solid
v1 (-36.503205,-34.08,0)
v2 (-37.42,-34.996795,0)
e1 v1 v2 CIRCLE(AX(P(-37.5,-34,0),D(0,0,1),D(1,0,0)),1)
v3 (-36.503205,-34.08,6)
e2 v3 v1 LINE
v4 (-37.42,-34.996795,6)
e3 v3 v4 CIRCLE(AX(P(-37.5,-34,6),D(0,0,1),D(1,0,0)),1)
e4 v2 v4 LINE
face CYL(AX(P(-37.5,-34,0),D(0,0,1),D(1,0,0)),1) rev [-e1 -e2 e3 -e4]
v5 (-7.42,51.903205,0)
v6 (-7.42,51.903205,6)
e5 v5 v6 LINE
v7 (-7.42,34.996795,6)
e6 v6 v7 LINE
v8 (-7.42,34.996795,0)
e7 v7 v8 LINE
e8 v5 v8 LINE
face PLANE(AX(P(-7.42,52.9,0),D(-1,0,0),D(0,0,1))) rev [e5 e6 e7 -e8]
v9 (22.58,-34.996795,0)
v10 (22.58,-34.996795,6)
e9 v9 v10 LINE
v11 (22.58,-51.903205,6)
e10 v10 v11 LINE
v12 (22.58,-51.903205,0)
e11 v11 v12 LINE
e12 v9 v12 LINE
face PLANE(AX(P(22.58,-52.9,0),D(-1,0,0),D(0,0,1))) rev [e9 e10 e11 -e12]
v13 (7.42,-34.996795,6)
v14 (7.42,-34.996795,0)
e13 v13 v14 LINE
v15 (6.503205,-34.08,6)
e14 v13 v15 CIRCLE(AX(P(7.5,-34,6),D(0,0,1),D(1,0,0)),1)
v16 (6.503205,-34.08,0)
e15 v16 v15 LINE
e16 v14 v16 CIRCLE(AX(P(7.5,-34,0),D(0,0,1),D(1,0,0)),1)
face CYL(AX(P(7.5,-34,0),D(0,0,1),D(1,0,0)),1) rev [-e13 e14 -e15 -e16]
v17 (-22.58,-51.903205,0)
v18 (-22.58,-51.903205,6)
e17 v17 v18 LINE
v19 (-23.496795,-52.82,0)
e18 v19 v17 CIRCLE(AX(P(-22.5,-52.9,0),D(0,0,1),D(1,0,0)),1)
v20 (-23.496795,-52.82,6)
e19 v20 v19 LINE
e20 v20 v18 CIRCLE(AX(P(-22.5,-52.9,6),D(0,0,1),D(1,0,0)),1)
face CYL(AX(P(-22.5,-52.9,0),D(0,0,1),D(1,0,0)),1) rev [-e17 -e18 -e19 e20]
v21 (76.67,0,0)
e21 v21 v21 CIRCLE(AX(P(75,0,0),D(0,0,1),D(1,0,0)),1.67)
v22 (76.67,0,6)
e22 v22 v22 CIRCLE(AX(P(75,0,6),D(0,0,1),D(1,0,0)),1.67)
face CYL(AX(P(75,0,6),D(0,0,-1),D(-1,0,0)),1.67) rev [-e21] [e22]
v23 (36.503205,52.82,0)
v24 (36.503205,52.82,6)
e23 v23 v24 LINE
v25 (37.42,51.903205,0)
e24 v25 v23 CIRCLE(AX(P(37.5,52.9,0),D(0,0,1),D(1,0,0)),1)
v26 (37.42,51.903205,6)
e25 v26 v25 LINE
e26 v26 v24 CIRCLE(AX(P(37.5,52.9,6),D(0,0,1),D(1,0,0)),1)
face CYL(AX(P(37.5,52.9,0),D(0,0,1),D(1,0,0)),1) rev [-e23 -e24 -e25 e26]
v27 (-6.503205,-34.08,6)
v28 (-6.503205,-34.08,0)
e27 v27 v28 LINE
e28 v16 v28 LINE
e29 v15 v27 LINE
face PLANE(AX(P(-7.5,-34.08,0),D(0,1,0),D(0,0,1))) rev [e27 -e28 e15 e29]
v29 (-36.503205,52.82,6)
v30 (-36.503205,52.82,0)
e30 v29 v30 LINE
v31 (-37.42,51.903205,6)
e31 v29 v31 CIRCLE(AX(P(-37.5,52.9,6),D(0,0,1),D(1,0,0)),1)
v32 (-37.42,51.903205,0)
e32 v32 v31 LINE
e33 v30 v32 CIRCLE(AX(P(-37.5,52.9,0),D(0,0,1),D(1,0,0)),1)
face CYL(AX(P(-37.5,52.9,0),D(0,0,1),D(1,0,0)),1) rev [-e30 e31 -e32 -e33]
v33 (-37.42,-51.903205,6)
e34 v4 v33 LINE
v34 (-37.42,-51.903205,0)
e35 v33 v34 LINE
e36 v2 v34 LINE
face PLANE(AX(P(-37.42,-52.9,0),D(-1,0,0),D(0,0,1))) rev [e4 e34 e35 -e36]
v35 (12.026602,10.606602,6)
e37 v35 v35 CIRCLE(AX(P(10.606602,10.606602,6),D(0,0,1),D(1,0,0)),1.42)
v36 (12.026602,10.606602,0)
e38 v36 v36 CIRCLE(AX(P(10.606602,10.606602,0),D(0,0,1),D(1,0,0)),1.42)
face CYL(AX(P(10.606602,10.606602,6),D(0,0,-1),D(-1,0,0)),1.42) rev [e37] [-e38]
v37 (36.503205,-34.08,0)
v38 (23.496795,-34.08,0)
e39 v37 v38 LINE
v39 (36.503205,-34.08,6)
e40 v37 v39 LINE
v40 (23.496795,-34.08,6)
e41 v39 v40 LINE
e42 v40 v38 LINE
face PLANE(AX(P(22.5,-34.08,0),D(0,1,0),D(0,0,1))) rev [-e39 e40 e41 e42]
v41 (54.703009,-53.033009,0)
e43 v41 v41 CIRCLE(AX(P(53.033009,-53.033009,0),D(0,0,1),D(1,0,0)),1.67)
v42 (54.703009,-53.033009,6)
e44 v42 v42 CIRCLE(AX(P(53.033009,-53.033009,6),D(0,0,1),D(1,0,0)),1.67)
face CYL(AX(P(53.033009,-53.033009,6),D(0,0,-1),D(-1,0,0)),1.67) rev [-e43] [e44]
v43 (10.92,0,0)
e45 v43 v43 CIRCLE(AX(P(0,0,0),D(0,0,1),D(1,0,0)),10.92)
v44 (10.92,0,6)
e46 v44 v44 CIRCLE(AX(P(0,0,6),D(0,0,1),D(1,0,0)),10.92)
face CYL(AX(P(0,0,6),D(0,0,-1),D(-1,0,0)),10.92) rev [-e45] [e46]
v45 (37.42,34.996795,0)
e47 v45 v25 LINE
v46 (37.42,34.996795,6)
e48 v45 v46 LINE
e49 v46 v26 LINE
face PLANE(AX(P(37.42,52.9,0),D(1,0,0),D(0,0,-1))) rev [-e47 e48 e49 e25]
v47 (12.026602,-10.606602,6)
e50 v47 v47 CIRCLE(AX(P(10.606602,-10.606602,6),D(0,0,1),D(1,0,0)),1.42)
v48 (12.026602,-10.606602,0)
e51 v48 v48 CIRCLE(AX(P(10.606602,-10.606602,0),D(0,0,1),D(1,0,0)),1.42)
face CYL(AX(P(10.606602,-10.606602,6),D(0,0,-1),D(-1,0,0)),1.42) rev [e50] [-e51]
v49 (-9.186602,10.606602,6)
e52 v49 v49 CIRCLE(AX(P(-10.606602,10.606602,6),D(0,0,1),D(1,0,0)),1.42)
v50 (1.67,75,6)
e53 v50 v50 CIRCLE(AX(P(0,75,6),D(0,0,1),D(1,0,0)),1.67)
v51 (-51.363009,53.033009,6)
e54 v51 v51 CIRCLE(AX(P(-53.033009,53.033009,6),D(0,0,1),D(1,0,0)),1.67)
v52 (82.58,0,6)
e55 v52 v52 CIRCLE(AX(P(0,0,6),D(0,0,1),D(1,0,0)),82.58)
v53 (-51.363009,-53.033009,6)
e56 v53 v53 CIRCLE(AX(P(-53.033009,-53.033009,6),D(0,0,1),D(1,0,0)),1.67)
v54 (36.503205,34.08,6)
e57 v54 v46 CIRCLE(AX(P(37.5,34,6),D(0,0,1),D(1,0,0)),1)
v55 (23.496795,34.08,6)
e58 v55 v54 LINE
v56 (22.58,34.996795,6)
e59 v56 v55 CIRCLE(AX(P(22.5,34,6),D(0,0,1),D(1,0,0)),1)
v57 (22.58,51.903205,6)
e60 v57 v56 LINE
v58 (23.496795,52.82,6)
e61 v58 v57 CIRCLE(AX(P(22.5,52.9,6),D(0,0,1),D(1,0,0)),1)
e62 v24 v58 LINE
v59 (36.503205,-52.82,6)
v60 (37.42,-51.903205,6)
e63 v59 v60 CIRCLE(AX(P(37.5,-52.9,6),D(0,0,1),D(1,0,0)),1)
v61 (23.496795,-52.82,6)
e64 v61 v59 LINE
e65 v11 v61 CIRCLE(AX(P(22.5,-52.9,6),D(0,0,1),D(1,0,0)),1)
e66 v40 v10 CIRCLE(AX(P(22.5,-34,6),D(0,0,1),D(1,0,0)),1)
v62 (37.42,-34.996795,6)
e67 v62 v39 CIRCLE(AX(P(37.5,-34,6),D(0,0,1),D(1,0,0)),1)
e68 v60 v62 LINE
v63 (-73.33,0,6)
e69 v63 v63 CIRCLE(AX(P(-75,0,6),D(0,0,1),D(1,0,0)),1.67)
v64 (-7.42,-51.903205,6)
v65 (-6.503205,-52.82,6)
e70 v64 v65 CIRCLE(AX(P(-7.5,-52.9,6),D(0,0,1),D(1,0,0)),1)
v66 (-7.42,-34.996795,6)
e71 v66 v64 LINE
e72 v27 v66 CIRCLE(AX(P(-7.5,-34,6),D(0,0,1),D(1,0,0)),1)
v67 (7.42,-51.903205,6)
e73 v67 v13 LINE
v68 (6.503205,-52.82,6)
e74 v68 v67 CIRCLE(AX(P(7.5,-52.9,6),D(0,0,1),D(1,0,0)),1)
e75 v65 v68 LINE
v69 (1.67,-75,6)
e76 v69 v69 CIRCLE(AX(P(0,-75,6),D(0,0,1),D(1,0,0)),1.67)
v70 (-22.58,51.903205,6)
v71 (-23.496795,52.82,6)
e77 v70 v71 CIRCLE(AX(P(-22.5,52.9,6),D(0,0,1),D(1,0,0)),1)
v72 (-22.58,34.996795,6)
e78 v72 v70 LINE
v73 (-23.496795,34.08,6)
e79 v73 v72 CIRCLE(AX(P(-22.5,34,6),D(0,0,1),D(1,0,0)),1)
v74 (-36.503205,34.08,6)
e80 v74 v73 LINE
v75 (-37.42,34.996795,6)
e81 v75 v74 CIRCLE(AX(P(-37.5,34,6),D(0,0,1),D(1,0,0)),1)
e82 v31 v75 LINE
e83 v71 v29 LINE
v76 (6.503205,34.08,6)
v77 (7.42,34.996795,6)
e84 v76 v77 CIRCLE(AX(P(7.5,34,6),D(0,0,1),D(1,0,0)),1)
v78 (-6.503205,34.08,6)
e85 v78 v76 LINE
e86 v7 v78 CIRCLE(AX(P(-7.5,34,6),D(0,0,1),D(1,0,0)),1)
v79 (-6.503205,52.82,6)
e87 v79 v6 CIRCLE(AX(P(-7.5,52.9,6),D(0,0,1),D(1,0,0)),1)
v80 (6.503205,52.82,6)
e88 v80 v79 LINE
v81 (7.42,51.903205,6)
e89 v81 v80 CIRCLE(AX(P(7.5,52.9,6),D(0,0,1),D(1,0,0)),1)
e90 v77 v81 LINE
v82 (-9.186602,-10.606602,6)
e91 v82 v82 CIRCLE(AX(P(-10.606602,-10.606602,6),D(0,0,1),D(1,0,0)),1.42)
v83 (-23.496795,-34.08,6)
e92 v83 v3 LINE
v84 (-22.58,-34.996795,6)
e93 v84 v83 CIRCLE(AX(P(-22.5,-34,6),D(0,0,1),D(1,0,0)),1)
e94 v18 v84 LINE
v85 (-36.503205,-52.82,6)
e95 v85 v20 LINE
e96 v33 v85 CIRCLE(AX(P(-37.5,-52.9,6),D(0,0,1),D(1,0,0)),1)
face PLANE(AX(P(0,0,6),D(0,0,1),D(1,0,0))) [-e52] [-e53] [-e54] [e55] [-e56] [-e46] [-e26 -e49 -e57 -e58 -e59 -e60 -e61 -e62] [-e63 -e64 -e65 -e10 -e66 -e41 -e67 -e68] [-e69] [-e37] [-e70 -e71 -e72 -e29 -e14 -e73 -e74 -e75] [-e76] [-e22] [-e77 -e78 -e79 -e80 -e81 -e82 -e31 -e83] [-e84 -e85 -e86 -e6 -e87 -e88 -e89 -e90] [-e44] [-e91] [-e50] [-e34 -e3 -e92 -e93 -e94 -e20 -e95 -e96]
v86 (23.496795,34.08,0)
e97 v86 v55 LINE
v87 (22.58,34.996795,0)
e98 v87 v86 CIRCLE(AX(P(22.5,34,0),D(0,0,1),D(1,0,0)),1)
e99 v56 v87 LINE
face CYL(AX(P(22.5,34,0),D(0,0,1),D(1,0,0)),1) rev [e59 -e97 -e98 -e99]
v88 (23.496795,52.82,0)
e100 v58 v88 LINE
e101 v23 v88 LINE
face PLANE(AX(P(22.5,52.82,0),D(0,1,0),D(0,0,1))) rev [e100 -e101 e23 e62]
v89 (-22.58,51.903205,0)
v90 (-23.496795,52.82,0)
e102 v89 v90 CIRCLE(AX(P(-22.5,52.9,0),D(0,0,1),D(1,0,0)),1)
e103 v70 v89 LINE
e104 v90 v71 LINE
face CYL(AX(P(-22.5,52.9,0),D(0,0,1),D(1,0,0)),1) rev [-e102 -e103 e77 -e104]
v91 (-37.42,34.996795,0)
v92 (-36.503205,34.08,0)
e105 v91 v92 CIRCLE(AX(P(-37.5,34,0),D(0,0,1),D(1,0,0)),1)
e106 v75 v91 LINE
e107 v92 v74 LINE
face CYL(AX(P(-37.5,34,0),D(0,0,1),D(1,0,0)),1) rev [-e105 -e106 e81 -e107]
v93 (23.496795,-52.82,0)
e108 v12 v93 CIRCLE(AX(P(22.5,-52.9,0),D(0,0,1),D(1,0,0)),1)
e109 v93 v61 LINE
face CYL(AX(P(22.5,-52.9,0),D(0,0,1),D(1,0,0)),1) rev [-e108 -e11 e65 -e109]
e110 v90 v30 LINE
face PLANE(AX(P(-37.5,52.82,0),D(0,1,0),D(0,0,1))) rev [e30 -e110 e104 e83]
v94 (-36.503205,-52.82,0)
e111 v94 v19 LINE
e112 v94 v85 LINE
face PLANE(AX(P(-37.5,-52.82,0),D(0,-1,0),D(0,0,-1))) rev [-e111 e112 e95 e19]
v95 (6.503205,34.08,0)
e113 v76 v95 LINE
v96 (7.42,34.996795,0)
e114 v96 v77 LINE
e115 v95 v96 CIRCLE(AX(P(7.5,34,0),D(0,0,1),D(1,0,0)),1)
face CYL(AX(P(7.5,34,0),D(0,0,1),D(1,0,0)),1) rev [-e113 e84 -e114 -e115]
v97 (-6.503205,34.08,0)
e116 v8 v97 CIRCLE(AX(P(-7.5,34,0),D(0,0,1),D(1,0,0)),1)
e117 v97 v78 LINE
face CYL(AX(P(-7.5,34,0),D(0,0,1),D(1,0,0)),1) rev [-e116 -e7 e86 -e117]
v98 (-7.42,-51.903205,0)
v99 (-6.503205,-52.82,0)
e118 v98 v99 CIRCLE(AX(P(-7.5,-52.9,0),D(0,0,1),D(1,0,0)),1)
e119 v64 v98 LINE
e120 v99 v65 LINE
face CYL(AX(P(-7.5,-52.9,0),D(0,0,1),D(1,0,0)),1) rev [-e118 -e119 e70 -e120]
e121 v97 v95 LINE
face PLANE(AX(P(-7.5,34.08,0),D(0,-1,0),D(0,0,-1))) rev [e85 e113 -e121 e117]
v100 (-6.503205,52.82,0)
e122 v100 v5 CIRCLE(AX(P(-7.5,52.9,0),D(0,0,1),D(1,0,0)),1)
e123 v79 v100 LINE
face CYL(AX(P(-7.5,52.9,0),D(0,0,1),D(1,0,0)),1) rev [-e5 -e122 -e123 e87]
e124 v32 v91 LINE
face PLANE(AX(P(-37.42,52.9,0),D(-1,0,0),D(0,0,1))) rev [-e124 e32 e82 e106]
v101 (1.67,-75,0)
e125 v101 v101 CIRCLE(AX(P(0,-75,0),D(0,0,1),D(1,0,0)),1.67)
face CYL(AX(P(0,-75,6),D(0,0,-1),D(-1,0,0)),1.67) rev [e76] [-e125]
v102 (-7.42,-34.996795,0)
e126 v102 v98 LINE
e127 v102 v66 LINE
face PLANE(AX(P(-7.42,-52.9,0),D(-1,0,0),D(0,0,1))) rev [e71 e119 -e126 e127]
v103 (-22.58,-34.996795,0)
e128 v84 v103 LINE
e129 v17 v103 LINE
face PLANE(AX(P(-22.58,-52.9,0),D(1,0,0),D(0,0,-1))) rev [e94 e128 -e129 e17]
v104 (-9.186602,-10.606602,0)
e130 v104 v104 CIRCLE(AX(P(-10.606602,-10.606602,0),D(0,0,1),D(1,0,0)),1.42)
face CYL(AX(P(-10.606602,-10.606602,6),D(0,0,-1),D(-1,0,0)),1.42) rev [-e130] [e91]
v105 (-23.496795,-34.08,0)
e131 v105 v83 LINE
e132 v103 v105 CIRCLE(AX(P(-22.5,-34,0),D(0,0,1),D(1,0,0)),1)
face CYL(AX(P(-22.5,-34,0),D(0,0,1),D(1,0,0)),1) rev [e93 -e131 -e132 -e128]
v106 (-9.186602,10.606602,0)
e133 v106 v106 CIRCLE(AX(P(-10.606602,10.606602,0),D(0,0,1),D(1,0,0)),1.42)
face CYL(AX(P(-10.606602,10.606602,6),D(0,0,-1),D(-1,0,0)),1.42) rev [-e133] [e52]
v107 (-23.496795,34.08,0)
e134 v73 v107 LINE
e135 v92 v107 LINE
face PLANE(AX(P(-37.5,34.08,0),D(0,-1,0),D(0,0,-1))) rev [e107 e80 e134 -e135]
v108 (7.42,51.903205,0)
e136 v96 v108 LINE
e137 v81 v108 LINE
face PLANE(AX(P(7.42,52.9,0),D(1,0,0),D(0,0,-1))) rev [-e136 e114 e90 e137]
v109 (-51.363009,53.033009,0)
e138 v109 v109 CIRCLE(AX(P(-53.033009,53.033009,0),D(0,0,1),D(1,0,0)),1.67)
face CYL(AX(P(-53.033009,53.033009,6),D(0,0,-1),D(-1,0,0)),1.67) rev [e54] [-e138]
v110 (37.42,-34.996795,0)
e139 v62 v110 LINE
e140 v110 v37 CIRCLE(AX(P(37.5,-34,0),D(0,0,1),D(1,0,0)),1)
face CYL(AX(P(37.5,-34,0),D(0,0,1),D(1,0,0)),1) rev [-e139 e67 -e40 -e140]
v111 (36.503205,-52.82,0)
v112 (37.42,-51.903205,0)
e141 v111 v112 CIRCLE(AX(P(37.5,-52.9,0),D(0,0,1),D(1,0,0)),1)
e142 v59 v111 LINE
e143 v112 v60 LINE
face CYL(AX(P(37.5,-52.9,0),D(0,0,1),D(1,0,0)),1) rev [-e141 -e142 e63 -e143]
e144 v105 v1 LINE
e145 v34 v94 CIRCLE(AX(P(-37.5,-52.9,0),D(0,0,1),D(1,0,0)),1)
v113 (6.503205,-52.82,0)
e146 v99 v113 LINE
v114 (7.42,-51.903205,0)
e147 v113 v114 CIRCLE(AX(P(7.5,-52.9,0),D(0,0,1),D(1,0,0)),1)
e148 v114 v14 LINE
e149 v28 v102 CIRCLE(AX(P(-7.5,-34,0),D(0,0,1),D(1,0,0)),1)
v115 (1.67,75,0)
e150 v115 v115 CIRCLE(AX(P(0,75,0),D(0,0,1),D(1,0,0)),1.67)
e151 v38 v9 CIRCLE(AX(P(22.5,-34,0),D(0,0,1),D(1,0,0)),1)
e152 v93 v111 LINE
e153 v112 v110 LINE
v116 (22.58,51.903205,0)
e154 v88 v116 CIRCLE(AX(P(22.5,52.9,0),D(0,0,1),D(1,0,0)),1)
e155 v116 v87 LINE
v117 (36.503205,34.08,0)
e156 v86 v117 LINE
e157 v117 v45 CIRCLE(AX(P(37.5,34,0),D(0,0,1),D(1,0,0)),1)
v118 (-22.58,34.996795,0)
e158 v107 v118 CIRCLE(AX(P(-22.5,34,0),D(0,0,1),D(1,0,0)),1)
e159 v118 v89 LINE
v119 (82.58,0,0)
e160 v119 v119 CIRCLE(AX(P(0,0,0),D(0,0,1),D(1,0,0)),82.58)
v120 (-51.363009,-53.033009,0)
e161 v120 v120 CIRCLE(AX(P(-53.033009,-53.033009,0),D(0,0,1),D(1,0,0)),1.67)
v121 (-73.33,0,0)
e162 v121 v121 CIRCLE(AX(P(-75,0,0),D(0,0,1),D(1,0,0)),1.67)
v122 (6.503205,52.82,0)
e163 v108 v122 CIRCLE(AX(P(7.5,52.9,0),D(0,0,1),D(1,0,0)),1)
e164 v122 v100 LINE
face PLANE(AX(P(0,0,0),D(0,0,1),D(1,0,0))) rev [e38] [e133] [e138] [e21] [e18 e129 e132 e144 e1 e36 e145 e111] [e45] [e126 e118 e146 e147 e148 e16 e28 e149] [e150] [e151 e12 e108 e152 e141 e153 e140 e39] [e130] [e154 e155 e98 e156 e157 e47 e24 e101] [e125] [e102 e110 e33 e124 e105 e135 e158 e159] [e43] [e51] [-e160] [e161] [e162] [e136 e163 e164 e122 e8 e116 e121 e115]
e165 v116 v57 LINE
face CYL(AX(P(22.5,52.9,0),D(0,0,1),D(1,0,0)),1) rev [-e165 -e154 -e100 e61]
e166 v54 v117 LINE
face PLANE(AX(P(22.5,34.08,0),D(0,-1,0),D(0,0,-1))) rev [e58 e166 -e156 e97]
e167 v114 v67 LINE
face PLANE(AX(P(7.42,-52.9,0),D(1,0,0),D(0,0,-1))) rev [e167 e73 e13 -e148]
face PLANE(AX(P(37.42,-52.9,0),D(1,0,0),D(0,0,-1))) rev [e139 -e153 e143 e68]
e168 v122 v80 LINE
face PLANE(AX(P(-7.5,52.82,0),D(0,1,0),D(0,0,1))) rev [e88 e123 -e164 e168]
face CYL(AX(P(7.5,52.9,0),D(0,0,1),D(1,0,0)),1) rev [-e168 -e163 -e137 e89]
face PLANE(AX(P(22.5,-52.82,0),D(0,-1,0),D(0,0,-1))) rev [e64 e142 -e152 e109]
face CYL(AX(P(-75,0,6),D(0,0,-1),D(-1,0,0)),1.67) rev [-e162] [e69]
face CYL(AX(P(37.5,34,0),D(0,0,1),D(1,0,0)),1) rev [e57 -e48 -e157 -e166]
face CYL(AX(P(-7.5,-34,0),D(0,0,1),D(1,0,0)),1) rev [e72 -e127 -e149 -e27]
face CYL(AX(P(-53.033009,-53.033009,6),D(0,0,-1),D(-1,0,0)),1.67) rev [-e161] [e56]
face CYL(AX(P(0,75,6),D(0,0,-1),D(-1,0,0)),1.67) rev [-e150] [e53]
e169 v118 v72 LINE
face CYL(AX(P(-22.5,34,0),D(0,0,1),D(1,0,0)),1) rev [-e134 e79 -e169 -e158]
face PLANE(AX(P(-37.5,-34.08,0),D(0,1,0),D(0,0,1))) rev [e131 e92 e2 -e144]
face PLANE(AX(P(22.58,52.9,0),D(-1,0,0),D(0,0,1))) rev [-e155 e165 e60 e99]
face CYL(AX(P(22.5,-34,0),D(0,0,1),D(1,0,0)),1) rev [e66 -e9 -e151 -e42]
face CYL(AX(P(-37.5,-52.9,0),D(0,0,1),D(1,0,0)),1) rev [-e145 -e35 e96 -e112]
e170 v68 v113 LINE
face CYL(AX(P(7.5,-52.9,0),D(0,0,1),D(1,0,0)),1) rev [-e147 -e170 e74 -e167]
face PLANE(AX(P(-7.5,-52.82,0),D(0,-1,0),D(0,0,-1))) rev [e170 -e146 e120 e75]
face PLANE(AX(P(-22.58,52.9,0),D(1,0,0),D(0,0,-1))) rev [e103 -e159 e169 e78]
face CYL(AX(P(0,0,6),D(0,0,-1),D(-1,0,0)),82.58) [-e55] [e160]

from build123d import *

# Parameters (mm, degrees)
SKETCH1_R              = 82.5
SKETCH1_R_2            = 11
SKETCH1_R_3            = 1.5
SKETCH1_R_4            = 1.75
BOSS_EXTRUDE1_DEPTH    = 6
SKETCH5_W              = 15
SKETCH5_H              = 18.9
CUT_EXTRUDE4_DEPTH     = 117.826794872
SKETCH6_R              = 1
CUT_EXTRUDE5_DEPTH     = 117.826794872
MOVE_FACE1_OUTLINE_R   = 82.58
MOVE_FACE1_OUTLINE_R_2 = 82.5
MOVE_FACE1_OUTLINE_R_3 = 11
MOVE_FACE1_OUTLINE_R_4 = 10.92
MOVE_FACE1_OUTLINE_R_5 = 1.5
MOVE_FACE1_OUTLINE_R_6 = 1.42
MOVE_FACE1_OUTLINE_R_7 = 1.75
MOVE_FACE1_OUTLINE_R_8 = 1.67
MOVE_FACE1_DEPTH       = 6


# Read off the part's stored shape, not the designer's step: Move Face1
with BuildPart() as part:
    # Sketch1 → Boss-Extrude1 (new body)
    with BuildSketch(Plane.XY):
        Circle(SKETCH1_R)
        Circle(SKETCH1_R_2, mode=Mode.SUBTRACT)
        with Locations((10.606601718, -10.606601718)):
            Circle(SKETCH1_R_3, mode=Mode.SUBTRACT)
        with Locations((0, -75)):
            Circle(SKETCH1_R_4, mode=Mode.SUBTRACT)
        with Locations((-10.606601718, -10.606601718)):
            Circle(SKETCH1_R_3, mode=Mode.SUBTRACT)
        with Locations((-10.606601718, 10.606601718)):
            Circle(SKETCH1_R_3, mode=Mode.SUBTRACT)
        with Locations((10.606601718, 10.606601718)):
            Circle(SKETCH1_R_3, mode=Mode.SUBTRACT)
        with Locations((-53.033008589, -53.033008589)):
            Circle(SKETCH1_R_4, mode=Mode.SUBTRACT)
        with Locations((-75, 0)):
            Circle(SKETCH1_R_4, mode=Mode.SUBTRACT)
        with Locations((-53.033008589, 53.033008589)):
            Circle(SKETCH1_R_4, mode=Mode.SUBTRACT)
        with Locations((0, 75)):
            Circle(SKETCH1_R_4, mode=Mode.SUBTRACT)
        with Locations((75, 0)):
            Circle(SKETCH1_R_4, mode=Mode.SUBTRACT)
        with Locations((53.033008589, -53.033008589)):
            Circle(SKETCH1_R_4, mode=Mode.SUBTRACT)
    extrude(amount=BOSS_EXTRUDE1_DEPTH)

    # Sketch5 → Cut-Extrude4 (cut, through all)
    with BuildSketch(Plane.XY.offset(6)):
        with Locations((-30, -43.45)):
            Rectangle(SKETCH5_W, SKETCH5_H)
        with Locations((-30, 43.45)):
            Rectangle(SKETCH5_W, SKETCH5_H)
        with Locations((30, 43.45)):
            Rectangle(SKETCH5_W, SKETCH5_H)
        with Locations((0, -43.45)):
            Rectangle(SKETCH5_W, SKETCH5_H)
        with Locations((30, -43.45)):
            Rectangle(SKETCH5_W, SKETCH5_H)
        with Locations((0, 43.45)):
            Rectangle(SKETCH5_W, SKETCH5_H)
    extrude(amount=-CUT_EXTRUDE4_DEPTH, mode=Mode.SUBTRACT)

    # Sketch6 → Cut-Extrude5 (cut, through all)
    with BuildSketch(Plane.XY.offset(6)):
        with Locations((-37.5, 52.9)):
            Circle(SKETCH6_R)
        with Locations((-22.5, 52.9)):
            Circle(SKETCH6_R)
        with Locations((-37.5, 34)):
            Circle(SKETCH6_R)
        with Locations((-22.5, 34)):
            Circle(SKETCH6_R)
        with Locations((-7.5, 52.9)):
            Circle(SKETCH6_R)
        with Locations((7.5, 52.9)):
            Circle(SKETCH6_R)
        with Locations((-7.5, 34)):
            Circle(SKETCH6_R)
        with Locations((7.5, 34)):
            Circle(SKETCH6_R)
        with Locations((22.5, 52.9)):
            Circle(SKETCH6_R)
        with Locations((37.5, 52.9)):
            Circle(SKETCH6_R)
        with Locations((22.5, 34)):
            Circle(SKETCH6_R)
        with Locations((37.5, 34)):
            Circle(SKETCH6_R)
        with Locations((-37.5, -34)):
            Circle(SKETCH6_R)
        with Locations((-22.5, -34)):
            Circle(SKETCH6_R)
        with Locations((-37.5, -52.9)):
            Circle(SKETCH6_R)
        with Locations((-22.5, -52.9)):
            Circle(SKETCH6_R)
        with Locations((-7.5, -34)):
            Circle(SKETCH6_R)
        with Locations((7.5, -34)):
            Circle(SKETCH6_R)
        with Locations((-7.5, -52.9)):
            Circle(SKETCH6_R)
        with Locations((7.5, -52.9)):
            Circle(SKETCH6_R)
        with Locations((22.5, -34)):
            Circle(SKETCH6_R)
        with Locations((37.5, -34)):
            Circle(SKETCH6_R)
        with Locations((22.5, -52.9)):
            Circle(SKETCH6_R)
        with Locations((37.5, -52.9)):
            Circle(SKETCH6_R)
    extrude(amount=-CUT_EXTRUDE5_DEPTH, mode=Mode.SUBTRACT)

    # Move Face1 outline → Move Face1 (add)
    # profile 1 of 37: a face of its own
    with BuildSketch(Plane.XY):
        Circle(MOVE_FACE1_OUTLINE_R)
        Circle(MOVE_FACE1_OUTLINE_R_2, mode=Mode.SUBTRACT)
    # profile 2 of 37: a face of its own
    with BuildSketch(Plane.XY):
        with BuildLine():
            Line((-37.42, -51.903205136), (-37.42, -34.996794864))
            ThreePointArc((-37.42, -34.996794864), (-37.45996791, -34.999198395), (-37.5, -35))
            Line((-37.5, -35), (-37.5, -51.9))
            ThreePointArc((-37.5, -51.9), (-37.45996791, -51.900801605), (-37.42, -51.903205136))
        make_face()
    # profile 3 of 37: a face of its own
    with BuildSketch(Plane.XY):
        with BuildLine():
            Line((-23.5, -34), (-36.5, -34))
            ThreePointArc((-36.5, -34), (-36.500801605, -34.04003209), (-36.503205136, -34.08))
            Line((-36.503205136, -34.08), (-23.496794864, -34.08))
            ThreePointArc((-23.496794864, -34.08), (-23.499198395, -34.04003209), (-23.5, -34))
        make_face()
    # profile 4 of 37: a face of its own
    with BuildSketch(Plane.XY):
        with BuildLine():
            ThreePointArc((-36.503205136, -52.82), (-36.500801605, -52.85996791), (-36.5, -52.9))
            Line((-36.5, -52.9), (-23.5, -52.9))
            ThreePointArc((-23.5, -52.9), (-23.499198395, -52.85996791), (-23.496794864, -52.82))
            Line((-23.496794864, -52.82), (-36.503205136, -52.82))
        make_face()
    # profile 5 of 37: a face of its own
    with BuildSketch(Plane.XY):
        with BuildLine():
            Line((-22.5, -51.9), (-22.5, -35))
            ThreePointArc((-22.5, -35), (-22.54003209, -34.999198395), (-22.58, -34.996794864))
            Line((-22.58, -34.996794864), (-22.58, -51.903205136))
            ThreePointArc((-22.58, -51.903205136), (-22.54003209, -51.900801605), (-22.5, -51.9))
        make_face()
    # profile 6 of 37: a face of its own
    with BuildSketch(Plane.XY):
        with BuildLine():
            Line((-37.42, 34.996794864), (-37.42, 51.903205136))
            ThreePointArc((-37.42, 51.903205136), (-37.45996791, 51.900801605), (-37.5, 51.9))
            Line((-37.5, 51.9), (-37.5, 35))
            ThreePointArc((-37.5, 35), (-37.45996791, 34.999198395), (-37.42, 34.996794864))
        make_face()
    # profile 7 of 37: a face of its own
    with BuildSketch(Plane.XY):
        with BuildLine():
            Line((-23.5, 52.9), (-36.5, 52.9))
            ThreePointArc((-36.5, 52.9), (-36.500801605, 52.85996791), (-36.503205136, 52.82))
            Line((-36.503205136, 52.82), (-23.496794864, 52.82))
            ThreePointArc((-23.496794864, 52.82), (-23.499198395, 52.85996791), (-23.5, 52.9))
        make_face()
    # profile 8 of 37: a face of its own
    with BuildSketch(Plane.XY):
        with BuildLine():
            ThreePointArc((-36.503205136, 34.08), (-36.500801605, 34.04003209), (-36.5, 34))
            Line((-36.5, 34), (-23.5, 34))
            ThreePointArc((-23.5, 34), (-23.499198395, 34.04003209), (-23.496794864, 34.08))
            Line((-23.496794864, 34.08), (-36.503205136, 34.08))
        make_face()
    # profile 9 of 37: a face of its own
    with BuildSketch(Plane.XY):
        with BuildLine():
            Line((-22.5, 35), (-22.5, 51.9))
            ThreePointArc((-22.5, 51.9), (-22.54003209, 51.900801605), (-22.58, 51.903205136))
            Line((-22.58, 51.903205136), (-22.58, 34.996794864))
            ThreePointArc((-22.58, 34.996794864), (-22.54003209, 34.999198395), (-22.5, 35))
        make_face()
    # profile 10 of 37: a face of its own
    with BuildSketch(Plane.XY):
        with BuildLine():
            Line((-6.503205136, -34.08), (6.503205136, -34.08))
            ThreePointArc((6.503205136, -34.08), (6.500801605, -34.04003209), (6.5, -34))
            Line((6.5, -34), (-6.5, -34))
            ThreePointArc((-6.5, -34), (-6.500801605, -34.04003209), (-6.503205136, -34.08))
        make_face()
    # profile 11 of 37: a face of its own
    with BuildSketch(Plane.XY):
        with BuildLine():
            Line((7.5, -51.9), (7.5, -35))
            ThreePointArc((7.5, -35), (7.45996791, -34.999198395), (7.42, -34.996794864))
            Line((7.42, -34.996794864), (7.42, -51.903205136))
            ThreePointArc((7.42, -51.903205136), (7.45996791, -51.900801605), (7.5, -51.9))
        make_face()
    # profile 12 of 37: a face of its own
    with BuildSketch(Plane.XY):
        with BuildLine():
            ThreePointArc((-7.42, -34.996794864), (-7.45996791, -34.999198395), (-7.5, -35))
            Line((-7.5, -35), (-7.5, -51.9))
            ThreePointArc((-7.5, -51.9), (-7.45996791, -51.900801605), (-7.42, -51.903205136))
            Line((-7.42, -51.903205136), (-7.42, -34.996794864))
        make_face()
    # profile 13 of 37: a face of its own
    with BuildSketch(Plane.XY):
        with BuildLine():
            Line((-6.5, -52.9), (6.5, -52.9))
            ThreePointArc((6.5, -52.9), (6.500801605, -52.85996791), (6.503205136, -52.82))
            Line((6.503205136, -52.82), (-6.503205136, -52.82))
            ThreePointArc((-6.503205136, -52.82), (-6.500801605, -52.85996791), (-6.5, -52.9))
        make_face()
    # profile 14 of 37: a face of its own
    with BuildSketch(Plane.XY):
        with BuildLine():
            Line((23.496794864, -34.08), (36.503205136, -34.08))
            ThreePointArc((36.503205136, -34.08), (36.500801605, -34.04003209), (36.5, -34))
            Line((36.5, -34), (23.5, -34))
            ThreePointArc((23.5, -34), (23.499198395, -34.04003209), (23.496794864, -34.08))
        make_face()
    # profile 15 of 37: a face of its own
    with BuildSketch(Plane.XY):
        with BuildLine():
            Line((37.5, -51.9), (37.5, -35))
            ThreePointArc((37.5, -35), (37.45996791, -34.999198395), (37.42, -34.996794864))
            Line((37.42, -34.996794864), (37.42, -51.903205136))
            ThreePointArc((37.42, -51.903205136), (37.45996791, -51.900801605), (37.5, -51.9))
        make_face()
    # profile 16 of 37: a face of its own
    with BuildSketch(Plane.XY):
        with BuildLine():
            ThreePointArc((22.58, -34.996794864), (22.54003209, -34.999198395), (22.5, -35))
            Line((22.5, -35), (22.5, -51.9))
            ThreePointArc((22.5, -51.9), (22.54003209, -51.900801605), (22.58, -51.903205136))
            Line((22.58, -51.903205136), (22.58, -34.996794864))
        make_face()
    # profile 17 of 37: a face of its own
    with BuildSketch(Plane.XY):
        with BuildLine():
            Line((23.5, -52.9), (36.5, -52.9))
            ThreePointArc((36.5, -52.9), (36.500801605, -52.85996791), (36.503205136, -52.82))
            Line((36.503205136, -52.82), (23.496794864, -52.82))
            ThreePointArc((23.496794864, -52.82), (23.499198395, -52.85996791), (23.5, -52.9))
        make_face()
    # profile 18 of 37: a face of its own
    with BuildSketch(Plane.XY):
        with BuildLine():
            Line((23.496794864, 52.82), (36.503205136, 52.82))
            ThreePointArc((36.503205136, 52.82), (36.500801605, 52.85996791), (36.5, 52.9))
            Line((36.5, 52.9), (23.5, 52.9))
            ThreePointArc((23.5, 52.9), (23.499198395, 52.85996791), (23.496794864, 52.82))
        make_face()
    # profile 19 of 37: a face of its own
    with BuildSketch(Plane.XY):
        with BuildLine():
            Line((37.5, 35), (37.5, 51.9))
            ThreePointArc((37.5, 51.9), (37.45996791, 51.900801605), (37.42, 51.903205136))
            Line((37.42, 51.903205136), (37.42, 34.996794864))
            ThreePointArc((37.42, 34.996794864), (37.45996791, 34.999198395), (37.5, 35))
        make_face()
    # profile 20 of 37: a face of its own
    with BuildSketch(Plane.XY):
        with BuildLine():
            ThreePointArc((22.58, 51.903205136), (22.54003209, 51.900801605), (22.5, 51.9))
            Line((22.5, 51.9), (22.5, 35))
            ThreePointArc((22.5, 35), (22.54003209, 34.999198395), (22.58, 34.996794864))
            Line((22.58, 34.996794864), (22.58, 51.903205136))
        make_face()
    # profile 21 of 37: a face of its own
    with BuildSketch(Plane.XY):
        with BuildLine():
            Line((23.5, 34), (36.5, 34))
            ThreePointArc((36.5, 34), (36.500801605, 34.04003209), (36.503205136, 34.08))
            Line((36.503205136, 34.08), (23.496794864, 34.08))
            ThreePointArc((23.496794864, 34.08), (23.499198395, 34.04003209), (23.5, 34))
        make_face()
    # profile 22 of 37: a face of its own
    with BuildSketch(Plane.XY):
        with BuildLine():
            Line((-6.503205136, 52.82), (6.503205136, 52.82))
            ThreePointArc((6.503205136, 52.82), (6.500801605, 52.85996791), (6.5, 52.9))
            Line((6.5, 52.9), (-6.5, 52.9))
            ThreePointArc((-6.5, 52.9), (-6.500801605, 52.85996791), (-6.503205136, 52.82))
        make_face()
    # profile 23 of 37: a face of its own
    with BuildSketch(Plane.XY):
        with BuildLine():
            Line((7.5, 35), (7.5, 51.9))
            ThreePointArc((7.5, 51.9), (7.45996791, 51.900801605), (7.42, 51.903205136))
            Line((7.42, 51.903205136), (7.42, 34.996794864))
            ThreePointArc((7.42, 34.996794864), (7.45996791, 34.999198395), (7.5, 35))
        make_face()
    # profile 24 of 37: a face of its own
    with BuildSketch(Plane.XY):
        with BuildLine():
            ThreePointArc((-7.42, 51.903205136), (-7.45996791, 51.900801605), (-7.5, 51.9))
            Line((-7.5, 51.9), (-7.5, 35))
            ThreePointArc((-7.5, 35), (-7.45996791, 34.999198395), (-7.42, 34.996794864))
            Line((-7.42, 34.996794864), (-7.42, 51.903205136))
        make_face()
    # profile 25 of 37: a face of its own
    with BuildSketch(Plane.XY):
        with BuildLine():
            Line((-6.5, 34), (6.5, 34))
            ThreePointArc((6.5, 34), (6.500801605, 34.04003209), (6.503205136, 34.08))
            Line((6.503205136, 34.08), (-6.503205136, 34.08))
            ThreePointArc((-6.503205136, 34.08), (-6.500801605, 34.04003209), (-6.5, 34))
        make_face()
    # profile 26 of 37: a face of its own
    with BuildSketch(Plane.XY):
        Circle(MOVE_FACE1_OUTLINE_R_3)
        Circle(MOVE_FACE1_OUTLINE_R_4, mode=Mode.SUBTRACT)
    # profile 27 of 37: a face of its own
    with BuildSketch(Plane.XY):
        with Locations((10.606601718, -10.606601718)):
            Circle(MOVE_FACE1_OUTLINE_R_5)
        with Locations((10.606601718, -10.606601718)):
            Circle(MOVE_FACE1_OUTLINE_R_6, mode=Mode.SUBTRACT)
    # profile 28 of 37: a face of its own
    with BuildSketch(Plane.XY):
        with Locations((0, -75)):
            Circle(MOVE_FACE1_OUTLINE_R_7)
        with Locations((0, -75)):
            Circle(MOVE_FACE1_OUTLINE_R_8, mode=Mode.SUBTRACT)
    # profile 29 of 37: a face of its own
    with BuildSketch(Plane.XY):
        with Locations((-10.606601718, -10.606601718)):
            Circle(MOVE_FACE1_OUTLINE_R_5)
        with Locations((-10.606601718, -10.606601718)):
            Circle(MOVE_FACE1_OUTLINE_R_6, mode=Mode.SUBTRACT)
    # profile 30 of 37: a face of its own
    with BuildSketch(Plane.XY):
        with Locations((-10.606601718, 10.606601718)):
            Circle(MOVE_FACE1_OUTLINE_R_5)
        with Locations((-10.606601718, 10.606601718)):
            Circle(MOVE_FACE1_OUTLINE_R_6, mode=Mode.SUBTRACT)
    # profile 31 of 37: a face of its own
    with BuildSketch(Plane.XY):
        with Locations((10.606601718, 10.606601718)):
            Circle(MOVE_FACE1_OUTLINE_R_5)
        with Locations((10.606601718, 10.606601718)):
            Circle(MOVE_FACE1_OUTLINE_R_6, mode=Mode.SUBTRACT)
    # profile 32 of 37: a face of its own
    with BuildSketch(Plane.XY):
        with Locations((-53.033008589, -53.033008589)):
            Circle(MOVE_FACE1_OUTLINE_R_7)
        with Locations((-53.033008589, -53.033008589)):
            Circle(MOVE_FACE1_OUTLINE_R_8, mode=Mode.SUBTRACT)
    # profile 33 of 37: a face of its own
    with BuildSketch(Plane.XY):
        with Locations((-75, 0)):
            Circle(MOVE_FACE1_OUTLINE_R_7)
        with Locations((-75, 0)):
            Circle(MOVE_FACE1_OUTLINE_R_8, mode=Mode.SUBTRACT)
    # profile 34 of 37: a face of its own
    with BuildSketch(Plane.XY):
        with Locations((-53.033008589, 53.033008589)):
            Circle(MOVE_FACE1_OUTLINE_R_7)
        with Locations((-53.033008589, 53.033008589)):
            Circle(MOVE_FACE1_OUTLINE_R_8, mode=Mode.SUBTRACT)
    # profile 35 of 37: a face of its own
    with BuildSketch(Plane.XY):
        with Locations((0, 75)):
            Circle(MOVE_FACE1_OUTLINE_R_7)
        with Locations((0, 75)):
            Circle(MOVE_FACE1_OUTLINE_R_8, mode=Mode.SUBTRACT)
    # profile 36 of 37: a face of its own
    with BuildSketch(Plane.XY):
        with Locations((75, 0)):
            Circle(MOVE_FACE1_OUTLINE_R_7)
        with Locations((75, 0)):
            Circle(MOVE_FACE1_OUTLINE_R_8, mode=Mode.SUBTRACT)
    # profile 37 of 37: a face of its own
    with BuildSketch(Plane.XY):
        with Locations((53.033008589, -53.033008589)):
            Circle(MOVE_FACE1_OUTLINE_R_7)
        with Locations((53.033008589, -53.033008589)):
            Circle(MOVE_FACE1_OUTLINE_R_8, mode=Mode.SUBTRACT)
    extrude(amount=MOVE_FACE1_DEPTH)


solid = part.part
